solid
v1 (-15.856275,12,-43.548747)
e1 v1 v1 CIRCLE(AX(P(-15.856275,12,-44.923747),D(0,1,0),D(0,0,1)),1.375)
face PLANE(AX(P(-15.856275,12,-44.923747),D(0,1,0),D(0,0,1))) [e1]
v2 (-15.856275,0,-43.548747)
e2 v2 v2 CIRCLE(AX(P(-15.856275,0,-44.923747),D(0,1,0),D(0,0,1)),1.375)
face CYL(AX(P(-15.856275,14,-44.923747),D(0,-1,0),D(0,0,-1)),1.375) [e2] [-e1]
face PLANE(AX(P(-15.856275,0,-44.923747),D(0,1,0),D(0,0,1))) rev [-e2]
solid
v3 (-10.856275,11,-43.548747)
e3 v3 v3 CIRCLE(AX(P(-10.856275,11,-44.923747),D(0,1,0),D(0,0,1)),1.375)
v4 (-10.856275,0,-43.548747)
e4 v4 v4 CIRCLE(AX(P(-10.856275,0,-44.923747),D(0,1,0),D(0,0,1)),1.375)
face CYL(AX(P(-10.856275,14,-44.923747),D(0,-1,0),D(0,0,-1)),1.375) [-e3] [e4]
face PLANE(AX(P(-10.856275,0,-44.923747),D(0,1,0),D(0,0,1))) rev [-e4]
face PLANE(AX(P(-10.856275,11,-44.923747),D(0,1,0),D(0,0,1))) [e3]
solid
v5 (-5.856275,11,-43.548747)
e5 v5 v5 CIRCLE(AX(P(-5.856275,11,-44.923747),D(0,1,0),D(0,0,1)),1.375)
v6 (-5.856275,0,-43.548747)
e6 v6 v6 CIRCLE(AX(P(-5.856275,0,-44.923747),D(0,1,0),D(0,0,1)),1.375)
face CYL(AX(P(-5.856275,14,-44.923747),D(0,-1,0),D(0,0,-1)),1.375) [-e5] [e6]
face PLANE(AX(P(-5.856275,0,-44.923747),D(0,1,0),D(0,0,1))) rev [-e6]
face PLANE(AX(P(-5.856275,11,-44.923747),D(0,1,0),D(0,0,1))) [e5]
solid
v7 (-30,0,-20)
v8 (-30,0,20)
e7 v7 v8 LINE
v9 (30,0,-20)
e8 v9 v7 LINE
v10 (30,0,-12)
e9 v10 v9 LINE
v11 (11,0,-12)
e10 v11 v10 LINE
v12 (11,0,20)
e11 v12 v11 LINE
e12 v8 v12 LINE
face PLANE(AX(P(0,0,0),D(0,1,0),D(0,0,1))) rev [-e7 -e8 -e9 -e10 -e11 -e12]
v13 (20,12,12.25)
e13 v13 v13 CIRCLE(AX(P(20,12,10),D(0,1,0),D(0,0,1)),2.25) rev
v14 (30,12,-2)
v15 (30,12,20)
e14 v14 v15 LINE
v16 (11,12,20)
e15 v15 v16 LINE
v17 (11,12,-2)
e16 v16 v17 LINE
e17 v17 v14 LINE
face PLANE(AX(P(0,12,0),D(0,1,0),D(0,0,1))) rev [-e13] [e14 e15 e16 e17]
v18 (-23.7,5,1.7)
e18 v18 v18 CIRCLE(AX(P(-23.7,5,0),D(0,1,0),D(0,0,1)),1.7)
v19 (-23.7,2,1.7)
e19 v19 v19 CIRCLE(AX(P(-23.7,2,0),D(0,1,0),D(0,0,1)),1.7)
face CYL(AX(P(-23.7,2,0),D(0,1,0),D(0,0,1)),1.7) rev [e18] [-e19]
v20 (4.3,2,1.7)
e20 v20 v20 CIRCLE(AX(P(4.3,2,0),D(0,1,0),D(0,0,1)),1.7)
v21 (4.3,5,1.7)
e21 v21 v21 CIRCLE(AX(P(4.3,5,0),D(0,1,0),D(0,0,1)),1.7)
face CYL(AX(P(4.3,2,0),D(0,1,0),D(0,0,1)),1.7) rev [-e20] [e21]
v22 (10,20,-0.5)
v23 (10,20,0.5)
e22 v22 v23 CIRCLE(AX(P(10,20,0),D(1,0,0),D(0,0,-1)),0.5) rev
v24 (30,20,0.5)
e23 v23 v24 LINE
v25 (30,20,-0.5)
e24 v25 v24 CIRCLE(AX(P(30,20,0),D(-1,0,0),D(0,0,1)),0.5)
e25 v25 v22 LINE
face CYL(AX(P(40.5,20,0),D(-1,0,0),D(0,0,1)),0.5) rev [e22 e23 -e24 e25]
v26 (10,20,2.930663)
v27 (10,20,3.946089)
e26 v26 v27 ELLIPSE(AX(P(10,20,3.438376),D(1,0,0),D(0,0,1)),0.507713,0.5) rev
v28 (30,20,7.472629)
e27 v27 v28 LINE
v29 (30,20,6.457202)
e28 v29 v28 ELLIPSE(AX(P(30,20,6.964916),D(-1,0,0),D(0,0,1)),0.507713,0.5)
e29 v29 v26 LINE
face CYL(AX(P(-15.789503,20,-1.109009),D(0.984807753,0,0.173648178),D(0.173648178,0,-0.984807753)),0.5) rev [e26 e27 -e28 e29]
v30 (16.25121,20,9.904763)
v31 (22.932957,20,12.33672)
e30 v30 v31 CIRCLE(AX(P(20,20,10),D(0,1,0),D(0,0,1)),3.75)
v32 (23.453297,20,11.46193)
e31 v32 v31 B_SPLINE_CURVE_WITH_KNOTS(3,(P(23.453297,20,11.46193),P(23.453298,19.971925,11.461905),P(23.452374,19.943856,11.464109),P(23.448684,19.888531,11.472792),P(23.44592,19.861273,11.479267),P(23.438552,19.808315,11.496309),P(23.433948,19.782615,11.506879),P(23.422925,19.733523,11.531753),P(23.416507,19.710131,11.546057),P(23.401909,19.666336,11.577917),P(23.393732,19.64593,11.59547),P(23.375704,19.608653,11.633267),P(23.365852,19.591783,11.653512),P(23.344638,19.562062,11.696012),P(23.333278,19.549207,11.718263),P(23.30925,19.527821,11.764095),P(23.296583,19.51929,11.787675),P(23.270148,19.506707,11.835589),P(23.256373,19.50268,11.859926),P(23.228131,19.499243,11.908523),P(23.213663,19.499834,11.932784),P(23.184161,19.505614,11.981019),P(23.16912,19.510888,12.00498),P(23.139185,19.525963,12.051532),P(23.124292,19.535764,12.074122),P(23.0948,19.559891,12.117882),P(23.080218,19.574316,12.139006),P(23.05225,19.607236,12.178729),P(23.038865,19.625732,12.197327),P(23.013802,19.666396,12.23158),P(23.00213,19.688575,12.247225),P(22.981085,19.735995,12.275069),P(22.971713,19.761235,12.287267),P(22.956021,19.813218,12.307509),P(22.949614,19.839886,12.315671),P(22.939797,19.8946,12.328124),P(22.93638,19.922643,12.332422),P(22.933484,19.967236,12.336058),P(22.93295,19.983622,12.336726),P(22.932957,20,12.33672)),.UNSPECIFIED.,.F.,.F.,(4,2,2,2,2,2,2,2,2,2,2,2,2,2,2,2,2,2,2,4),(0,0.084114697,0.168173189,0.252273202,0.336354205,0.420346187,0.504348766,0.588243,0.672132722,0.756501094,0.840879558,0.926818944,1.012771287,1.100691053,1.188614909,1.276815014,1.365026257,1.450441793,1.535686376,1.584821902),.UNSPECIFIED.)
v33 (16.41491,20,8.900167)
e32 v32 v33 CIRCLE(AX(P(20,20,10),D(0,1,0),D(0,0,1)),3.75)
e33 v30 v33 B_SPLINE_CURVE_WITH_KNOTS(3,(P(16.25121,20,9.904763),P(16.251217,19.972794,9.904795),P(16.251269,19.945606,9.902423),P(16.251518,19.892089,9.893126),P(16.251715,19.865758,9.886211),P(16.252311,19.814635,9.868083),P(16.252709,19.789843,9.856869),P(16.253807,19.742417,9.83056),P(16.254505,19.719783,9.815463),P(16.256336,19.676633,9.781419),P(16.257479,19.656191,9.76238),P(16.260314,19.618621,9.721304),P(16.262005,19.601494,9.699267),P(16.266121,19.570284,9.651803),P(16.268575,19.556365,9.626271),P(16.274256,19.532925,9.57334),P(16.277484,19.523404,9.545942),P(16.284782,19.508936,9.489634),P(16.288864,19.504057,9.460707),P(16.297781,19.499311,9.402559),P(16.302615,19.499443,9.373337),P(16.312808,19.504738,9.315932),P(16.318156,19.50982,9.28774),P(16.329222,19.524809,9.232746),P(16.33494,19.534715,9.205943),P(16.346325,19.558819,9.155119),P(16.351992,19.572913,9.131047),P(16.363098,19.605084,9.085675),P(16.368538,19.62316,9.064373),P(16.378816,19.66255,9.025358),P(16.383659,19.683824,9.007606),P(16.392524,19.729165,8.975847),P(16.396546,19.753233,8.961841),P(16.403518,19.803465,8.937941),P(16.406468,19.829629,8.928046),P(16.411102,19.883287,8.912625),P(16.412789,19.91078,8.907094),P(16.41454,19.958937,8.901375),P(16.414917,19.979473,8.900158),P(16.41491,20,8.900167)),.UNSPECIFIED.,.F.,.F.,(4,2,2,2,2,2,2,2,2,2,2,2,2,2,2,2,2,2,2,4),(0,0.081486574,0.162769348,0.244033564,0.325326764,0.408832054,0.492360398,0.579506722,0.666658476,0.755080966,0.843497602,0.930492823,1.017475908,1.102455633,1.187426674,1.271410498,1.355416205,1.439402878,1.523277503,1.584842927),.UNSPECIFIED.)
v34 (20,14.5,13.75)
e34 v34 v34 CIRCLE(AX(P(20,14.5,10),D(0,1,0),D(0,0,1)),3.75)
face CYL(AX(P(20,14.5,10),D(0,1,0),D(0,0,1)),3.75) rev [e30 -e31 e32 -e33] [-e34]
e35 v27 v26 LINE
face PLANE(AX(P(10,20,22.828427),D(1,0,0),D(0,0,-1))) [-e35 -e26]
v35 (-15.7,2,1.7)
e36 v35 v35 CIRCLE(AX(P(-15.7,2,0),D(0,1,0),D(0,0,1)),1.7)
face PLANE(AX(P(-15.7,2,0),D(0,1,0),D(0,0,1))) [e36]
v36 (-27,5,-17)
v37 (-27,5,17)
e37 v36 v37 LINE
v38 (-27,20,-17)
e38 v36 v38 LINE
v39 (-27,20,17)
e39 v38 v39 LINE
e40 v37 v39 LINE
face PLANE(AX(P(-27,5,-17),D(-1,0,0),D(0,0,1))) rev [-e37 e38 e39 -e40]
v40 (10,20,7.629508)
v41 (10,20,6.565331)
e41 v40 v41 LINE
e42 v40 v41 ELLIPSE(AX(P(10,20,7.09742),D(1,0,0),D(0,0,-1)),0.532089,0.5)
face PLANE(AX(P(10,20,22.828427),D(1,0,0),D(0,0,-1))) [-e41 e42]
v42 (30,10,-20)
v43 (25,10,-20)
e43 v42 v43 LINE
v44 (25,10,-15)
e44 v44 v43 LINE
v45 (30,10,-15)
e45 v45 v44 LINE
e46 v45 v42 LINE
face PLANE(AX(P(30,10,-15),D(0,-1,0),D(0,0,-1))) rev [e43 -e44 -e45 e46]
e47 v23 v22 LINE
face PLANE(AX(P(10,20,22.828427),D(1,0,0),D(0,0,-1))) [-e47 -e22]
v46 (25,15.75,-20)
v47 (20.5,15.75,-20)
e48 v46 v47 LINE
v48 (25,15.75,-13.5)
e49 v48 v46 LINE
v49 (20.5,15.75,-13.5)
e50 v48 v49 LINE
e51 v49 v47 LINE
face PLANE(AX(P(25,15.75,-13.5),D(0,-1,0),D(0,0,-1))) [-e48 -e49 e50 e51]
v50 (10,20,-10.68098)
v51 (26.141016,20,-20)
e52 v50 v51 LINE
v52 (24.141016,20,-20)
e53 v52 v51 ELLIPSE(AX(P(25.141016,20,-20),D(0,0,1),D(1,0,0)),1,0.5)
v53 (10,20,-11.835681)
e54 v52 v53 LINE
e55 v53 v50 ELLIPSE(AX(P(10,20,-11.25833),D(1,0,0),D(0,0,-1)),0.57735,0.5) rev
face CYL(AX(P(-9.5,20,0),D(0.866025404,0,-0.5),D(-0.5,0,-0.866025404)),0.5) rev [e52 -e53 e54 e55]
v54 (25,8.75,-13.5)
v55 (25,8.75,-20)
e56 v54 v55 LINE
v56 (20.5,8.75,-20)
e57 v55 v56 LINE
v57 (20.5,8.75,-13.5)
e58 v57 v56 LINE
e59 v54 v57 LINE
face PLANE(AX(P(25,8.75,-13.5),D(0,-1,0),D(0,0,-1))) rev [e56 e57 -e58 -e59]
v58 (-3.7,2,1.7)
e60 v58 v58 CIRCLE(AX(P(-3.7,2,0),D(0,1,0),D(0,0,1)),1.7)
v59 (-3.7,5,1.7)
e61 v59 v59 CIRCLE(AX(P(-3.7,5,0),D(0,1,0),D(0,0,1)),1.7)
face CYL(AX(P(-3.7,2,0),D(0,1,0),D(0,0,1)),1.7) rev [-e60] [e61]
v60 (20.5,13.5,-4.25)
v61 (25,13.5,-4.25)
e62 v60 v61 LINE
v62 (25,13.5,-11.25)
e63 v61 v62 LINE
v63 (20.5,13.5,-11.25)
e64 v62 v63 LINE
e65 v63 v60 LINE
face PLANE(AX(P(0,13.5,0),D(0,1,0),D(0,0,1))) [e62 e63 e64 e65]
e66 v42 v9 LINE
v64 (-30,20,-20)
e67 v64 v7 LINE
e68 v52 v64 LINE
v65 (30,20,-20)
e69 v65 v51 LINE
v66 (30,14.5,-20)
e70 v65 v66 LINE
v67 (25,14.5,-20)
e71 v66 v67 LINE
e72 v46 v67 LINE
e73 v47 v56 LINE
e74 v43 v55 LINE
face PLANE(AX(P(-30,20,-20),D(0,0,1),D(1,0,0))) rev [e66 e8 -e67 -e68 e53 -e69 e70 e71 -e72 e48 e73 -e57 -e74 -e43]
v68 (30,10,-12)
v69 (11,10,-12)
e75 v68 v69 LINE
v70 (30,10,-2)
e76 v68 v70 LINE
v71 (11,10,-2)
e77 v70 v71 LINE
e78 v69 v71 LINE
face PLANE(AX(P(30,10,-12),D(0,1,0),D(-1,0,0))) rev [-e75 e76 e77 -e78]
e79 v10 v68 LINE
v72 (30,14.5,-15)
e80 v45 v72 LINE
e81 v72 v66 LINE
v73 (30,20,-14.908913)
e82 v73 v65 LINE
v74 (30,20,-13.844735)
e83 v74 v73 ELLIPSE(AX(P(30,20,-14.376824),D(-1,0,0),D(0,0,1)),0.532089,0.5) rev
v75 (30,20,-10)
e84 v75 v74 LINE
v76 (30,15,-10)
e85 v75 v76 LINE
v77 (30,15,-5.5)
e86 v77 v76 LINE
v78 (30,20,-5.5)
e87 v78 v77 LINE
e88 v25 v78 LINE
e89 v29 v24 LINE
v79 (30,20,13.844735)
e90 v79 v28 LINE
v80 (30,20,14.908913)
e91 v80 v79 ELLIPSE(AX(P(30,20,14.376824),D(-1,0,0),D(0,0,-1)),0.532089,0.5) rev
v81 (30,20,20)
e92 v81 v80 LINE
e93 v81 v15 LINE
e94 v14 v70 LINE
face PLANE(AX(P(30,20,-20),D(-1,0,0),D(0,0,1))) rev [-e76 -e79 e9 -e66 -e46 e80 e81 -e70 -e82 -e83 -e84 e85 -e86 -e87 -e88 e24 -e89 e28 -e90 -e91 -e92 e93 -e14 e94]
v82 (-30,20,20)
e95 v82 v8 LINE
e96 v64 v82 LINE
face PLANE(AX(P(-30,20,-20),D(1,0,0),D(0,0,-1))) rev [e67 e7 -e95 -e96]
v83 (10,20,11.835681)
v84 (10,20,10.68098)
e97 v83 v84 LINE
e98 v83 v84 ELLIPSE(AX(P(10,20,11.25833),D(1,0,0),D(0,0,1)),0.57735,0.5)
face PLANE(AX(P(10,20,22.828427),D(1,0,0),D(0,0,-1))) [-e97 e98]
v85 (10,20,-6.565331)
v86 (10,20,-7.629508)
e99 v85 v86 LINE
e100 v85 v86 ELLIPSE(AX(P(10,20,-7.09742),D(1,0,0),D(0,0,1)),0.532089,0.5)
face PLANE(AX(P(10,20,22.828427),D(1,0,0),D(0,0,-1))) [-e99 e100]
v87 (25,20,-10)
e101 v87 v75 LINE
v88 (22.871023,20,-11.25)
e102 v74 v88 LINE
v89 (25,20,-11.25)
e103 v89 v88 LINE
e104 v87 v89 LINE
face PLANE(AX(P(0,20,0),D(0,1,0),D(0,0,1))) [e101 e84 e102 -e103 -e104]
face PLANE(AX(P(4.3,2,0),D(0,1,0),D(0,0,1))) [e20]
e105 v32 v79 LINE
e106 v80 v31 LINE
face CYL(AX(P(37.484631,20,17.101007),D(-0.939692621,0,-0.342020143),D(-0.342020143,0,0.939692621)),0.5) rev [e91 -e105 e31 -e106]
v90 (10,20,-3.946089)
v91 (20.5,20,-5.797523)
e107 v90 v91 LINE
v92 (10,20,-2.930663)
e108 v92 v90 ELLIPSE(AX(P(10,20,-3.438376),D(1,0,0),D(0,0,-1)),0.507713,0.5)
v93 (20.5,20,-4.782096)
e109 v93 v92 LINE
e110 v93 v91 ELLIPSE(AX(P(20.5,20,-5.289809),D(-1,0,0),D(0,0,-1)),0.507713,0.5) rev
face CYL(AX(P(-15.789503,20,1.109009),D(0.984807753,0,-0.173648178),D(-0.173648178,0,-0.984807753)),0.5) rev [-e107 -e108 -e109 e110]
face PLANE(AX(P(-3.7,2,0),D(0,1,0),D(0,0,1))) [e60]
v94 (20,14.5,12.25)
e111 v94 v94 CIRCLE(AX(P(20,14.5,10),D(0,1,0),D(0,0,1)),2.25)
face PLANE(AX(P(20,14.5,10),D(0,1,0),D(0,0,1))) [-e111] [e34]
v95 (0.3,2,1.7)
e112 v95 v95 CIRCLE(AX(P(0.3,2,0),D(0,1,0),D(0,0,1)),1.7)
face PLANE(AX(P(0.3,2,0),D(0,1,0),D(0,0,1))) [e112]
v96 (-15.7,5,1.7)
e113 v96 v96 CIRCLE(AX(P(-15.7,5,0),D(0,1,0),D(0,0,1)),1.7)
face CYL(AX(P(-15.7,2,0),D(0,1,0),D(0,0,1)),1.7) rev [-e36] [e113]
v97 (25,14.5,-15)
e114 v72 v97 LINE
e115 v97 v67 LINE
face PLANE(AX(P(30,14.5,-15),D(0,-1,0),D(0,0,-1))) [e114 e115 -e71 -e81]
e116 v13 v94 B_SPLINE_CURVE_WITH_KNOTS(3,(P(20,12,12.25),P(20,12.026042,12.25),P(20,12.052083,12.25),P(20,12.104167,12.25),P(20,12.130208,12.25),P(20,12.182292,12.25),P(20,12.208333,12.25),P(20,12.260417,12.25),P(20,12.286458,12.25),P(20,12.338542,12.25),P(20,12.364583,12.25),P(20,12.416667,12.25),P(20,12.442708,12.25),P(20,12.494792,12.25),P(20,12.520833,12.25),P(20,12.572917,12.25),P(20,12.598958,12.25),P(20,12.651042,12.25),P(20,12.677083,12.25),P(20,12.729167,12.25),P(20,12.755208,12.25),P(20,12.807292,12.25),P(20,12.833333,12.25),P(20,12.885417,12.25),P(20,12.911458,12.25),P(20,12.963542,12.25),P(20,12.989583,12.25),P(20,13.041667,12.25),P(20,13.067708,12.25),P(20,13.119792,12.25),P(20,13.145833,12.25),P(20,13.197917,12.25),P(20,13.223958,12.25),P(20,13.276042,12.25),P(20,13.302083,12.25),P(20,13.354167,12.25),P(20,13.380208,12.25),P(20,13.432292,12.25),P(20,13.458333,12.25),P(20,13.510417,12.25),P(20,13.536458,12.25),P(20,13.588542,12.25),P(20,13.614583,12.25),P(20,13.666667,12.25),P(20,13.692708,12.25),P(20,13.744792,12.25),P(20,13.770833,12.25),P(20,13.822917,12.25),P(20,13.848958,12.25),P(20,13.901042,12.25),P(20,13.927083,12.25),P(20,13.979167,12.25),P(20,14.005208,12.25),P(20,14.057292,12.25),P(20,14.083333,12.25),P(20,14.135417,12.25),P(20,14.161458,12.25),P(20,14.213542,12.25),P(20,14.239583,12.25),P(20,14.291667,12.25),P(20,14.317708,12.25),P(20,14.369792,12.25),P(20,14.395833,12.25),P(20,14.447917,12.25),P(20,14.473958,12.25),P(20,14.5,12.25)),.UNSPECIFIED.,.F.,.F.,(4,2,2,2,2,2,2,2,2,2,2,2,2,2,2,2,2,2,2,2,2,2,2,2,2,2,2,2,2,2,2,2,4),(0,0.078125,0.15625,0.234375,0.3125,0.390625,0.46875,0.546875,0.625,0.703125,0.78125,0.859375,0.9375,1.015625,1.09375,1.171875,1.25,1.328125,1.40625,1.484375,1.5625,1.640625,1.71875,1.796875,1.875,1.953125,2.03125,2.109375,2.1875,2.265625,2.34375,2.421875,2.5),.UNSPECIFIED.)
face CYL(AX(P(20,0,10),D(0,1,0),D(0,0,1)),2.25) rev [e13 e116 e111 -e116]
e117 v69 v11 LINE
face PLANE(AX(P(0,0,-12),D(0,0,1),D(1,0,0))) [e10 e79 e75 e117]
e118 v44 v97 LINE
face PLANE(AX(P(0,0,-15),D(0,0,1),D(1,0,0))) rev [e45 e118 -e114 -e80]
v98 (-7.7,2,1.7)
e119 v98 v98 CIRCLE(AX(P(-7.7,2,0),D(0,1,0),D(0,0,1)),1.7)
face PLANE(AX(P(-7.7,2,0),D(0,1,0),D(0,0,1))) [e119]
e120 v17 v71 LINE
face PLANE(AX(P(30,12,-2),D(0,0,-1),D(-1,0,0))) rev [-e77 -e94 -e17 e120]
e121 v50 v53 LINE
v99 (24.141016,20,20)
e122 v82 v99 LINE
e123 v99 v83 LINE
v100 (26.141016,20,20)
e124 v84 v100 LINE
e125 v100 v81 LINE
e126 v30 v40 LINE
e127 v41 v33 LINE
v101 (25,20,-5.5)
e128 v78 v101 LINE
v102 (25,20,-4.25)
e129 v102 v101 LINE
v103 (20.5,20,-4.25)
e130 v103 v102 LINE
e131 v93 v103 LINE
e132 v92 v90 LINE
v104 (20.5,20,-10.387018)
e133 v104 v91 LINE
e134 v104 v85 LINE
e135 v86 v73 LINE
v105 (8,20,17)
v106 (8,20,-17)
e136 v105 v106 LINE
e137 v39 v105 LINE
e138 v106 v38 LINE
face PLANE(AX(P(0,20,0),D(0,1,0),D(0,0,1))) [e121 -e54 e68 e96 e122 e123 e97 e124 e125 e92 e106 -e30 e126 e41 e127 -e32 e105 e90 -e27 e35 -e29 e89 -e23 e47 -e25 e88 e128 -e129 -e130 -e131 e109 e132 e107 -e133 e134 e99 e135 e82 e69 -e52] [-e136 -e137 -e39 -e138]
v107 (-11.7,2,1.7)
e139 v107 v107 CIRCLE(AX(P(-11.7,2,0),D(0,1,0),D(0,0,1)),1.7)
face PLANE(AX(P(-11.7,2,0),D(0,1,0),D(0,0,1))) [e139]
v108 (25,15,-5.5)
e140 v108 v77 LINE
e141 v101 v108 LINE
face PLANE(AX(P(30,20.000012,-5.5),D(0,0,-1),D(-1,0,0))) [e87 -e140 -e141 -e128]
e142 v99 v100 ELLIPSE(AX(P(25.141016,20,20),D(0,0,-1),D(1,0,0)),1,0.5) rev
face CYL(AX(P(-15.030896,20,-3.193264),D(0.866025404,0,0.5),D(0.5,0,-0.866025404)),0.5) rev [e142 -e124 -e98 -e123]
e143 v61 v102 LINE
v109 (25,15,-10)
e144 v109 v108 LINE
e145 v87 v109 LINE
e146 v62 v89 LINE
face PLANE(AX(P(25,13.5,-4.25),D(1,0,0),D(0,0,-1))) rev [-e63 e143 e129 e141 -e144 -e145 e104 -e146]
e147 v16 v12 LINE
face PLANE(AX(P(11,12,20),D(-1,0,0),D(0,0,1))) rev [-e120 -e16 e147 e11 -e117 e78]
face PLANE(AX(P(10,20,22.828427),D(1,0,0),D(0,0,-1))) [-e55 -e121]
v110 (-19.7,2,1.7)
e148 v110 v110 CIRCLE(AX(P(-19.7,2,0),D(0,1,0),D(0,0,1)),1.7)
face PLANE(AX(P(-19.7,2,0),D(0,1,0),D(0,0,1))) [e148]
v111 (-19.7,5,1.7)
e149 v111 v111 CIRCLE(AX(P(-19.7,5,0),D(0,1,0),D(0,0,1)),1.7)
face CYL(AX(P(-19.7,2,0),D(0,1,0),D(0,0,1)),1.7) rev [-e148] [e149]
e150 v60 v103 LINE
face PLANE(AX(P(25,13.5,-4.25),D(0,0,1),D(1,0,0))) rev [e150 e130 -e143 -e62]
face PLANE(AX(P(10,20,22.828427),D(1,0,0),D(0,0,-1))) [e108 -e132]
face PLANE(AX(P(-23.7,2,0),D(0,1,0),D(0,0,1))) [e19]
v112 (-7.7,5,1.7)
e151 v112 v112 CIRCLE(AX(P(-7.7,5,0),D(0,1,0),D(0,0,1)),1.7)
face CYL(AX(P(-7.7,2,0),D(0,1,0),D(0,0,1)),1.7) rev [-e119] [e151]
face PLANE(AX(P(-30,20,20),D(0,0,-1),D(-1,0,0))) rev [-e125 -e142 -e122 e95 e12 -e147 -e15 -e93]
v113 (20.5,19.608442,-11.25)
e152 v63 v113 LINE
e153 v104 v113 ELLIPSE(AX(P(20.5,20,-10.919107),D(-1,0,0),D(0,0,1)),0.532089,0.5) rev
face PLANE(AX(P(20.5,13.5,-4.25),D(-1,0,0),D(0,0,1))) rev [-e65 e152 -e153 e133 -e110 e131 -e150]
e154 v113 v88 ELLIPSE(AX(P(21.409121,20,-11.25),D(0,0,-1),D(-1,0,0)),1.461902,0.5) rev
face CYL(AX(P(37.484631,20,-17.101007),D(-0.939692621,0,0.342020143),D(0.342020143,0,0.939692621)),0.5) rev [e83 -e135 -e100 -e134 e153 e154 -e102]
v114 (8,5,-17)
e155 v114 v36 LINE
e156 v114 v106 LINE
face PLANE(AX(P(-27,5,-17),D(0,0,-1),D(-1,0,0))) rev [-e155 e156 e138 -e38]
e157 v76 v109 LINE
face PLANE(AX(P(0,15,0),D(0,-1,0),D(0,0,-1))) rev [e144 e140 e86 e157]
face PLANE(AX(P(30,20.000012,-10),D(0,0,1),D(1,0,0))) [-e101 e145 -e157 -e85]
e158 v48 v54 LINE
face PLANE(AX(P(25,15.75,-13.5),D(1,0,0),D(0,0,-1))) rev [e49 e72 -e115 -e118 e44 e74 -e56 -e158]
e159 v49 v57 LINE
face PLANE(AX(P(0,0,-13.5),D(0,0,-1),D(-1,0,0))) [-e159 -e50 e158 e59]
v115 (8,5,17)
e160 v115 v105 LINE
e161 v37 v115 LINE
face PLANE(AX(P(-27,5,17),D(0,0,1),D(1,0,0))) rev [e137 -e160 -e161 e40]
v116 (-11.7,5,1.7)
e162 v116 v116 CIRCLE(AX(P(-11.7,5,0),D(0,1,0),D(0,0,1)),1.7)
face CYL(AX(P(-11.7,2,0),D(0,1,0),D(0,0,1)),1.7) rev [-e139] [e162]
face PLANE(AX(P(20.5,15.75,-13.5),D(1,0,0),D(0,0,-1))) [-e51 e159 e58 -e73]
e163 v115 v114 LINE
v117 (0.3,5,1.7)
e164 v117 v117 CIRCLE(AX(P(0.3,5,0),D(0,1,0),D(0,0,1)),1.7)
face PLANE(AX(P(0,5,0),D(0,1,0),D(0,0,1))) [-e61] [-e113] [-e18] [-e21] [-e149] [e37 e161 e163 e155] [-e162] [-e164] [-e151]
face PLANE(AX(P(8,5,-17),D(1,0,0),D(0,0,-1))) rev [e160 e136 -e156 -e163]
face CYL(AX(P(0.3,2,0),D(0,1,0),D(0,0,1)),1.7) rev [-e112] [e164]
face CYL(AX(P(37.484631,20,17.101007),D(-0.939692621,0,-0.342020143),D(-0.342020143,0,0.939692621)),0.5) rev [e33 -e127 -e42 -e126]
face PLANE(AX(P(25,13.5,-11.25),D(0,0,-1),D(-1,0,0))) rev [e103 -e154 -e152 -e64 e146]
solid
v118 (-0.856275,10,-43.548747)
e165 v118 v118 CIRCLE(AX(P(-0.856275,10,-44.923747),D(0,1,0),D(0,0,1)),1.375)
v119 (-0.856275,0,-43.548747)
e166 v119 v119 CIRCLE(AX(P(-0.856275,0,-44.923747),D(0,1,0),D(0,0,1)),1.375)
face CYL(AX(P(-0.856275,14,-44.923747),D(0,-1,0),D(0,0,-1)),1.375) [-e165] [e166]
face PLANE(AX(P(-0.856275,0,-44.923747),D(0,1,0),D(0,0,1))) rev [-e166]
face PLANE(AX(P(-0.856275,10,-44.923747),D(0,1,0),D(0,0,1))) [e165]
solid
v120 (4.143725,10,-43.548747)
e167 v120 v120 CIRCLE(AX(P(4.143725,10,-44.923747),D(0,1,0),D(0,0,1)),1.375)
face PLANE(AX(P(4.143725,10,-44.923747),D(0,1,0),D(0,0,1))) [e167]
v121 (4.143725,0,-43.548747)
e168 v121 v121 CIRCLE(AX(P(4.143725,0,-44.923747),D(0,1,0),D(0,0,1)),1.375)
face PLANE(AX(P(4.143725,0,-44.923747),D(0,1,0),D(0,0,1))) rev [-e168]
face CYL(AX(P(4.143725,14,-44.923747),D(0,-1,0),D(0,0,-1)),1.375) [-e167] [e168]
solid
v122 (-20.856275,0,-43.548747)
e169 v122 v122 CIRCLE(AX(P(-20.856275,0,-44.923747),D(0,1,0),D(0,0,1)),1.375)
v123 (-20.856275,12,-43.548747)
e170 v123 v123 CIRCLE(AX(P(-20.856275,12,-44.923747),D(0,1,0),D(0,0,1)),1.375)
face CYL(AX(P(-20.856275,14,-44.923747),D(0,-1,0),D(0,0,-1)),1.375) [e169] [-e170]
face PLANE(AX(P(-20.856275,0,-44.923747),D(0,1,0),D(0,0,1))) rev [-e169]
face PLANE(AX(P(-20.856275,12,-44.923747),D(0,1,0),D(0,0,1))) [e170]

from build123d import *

# Parameters (mm, degrees)
SKETCH1_W               = 60
SKETCH1_H               = 40
BOSS_EXTRUDE1_DEPTH     = 20
SKETCH3_W               = 35
SKETCH3_H               = 34
CUT_EXTRUDE2_DEPTH      = 15
SKETCH4_R               = 3.75
CUT_EXTRUDE3_DEPTH      = 5.5
CUT_EXTRUDE4_DEPTH      = 39.861935104
CUT_EXTRUDE4_DEPTH_BACK = 39.861935104
SKETCH5_R               = 2.25
CUT_EXTRUDE5_DEPTH      = 42.231056256
CUT_EXTRUDE5_DEPTH_BACK = 5
SKETCH6_W               = 5
SKETCH6_H               = 4.5
SKETCH7_W               = 4.5
SKETCH7_H               = 7
CUT_EXTRUDE6_DEPTH      = 6.5
SKETCH8_W               = 5
SKETCH8_H               = 4.5
CUT_EXTRUDE7_DEPTH      = 5
SKETCH9_W               = 4.5
SKETCH9_H               = 7
CUT_EXTRUDE8_DEPTH      = 6.5
SKETCH13_R              = 1.7
CUT_EXTRUDE9_DEPTH      = 3
SKETCH14_R              = 1.375
BOSS_EXTRUDE2_DEPTH     = 14
BOSS_EXTRUDE2_2_DEPTH   = 14
BOSS_EXTRUDE2_3_DEPTH   = 14
BOSS_EXTRUDE2_4_DEPTH   = 14
BOSS_EXTRUDE2_5_DEPTH   = 14
BOSS_EXTRUDE2_6_DEPTH   = 14
SKETCH17_R              = 1.375
CUT_EXTRUDE10_DEPTH     = 2
SKETCH18_R              = 1.375
CUT_EXTRUDE11_DEPTH     = 3
SKETCH19_R              = 1.375
CUT_EXTRUDE12_DEPTH     = 4
CUT_SWEEP2_PROFILE_R    = 0.5
CUT_SWEEP3_START        = 8
CUT_SWEEP3_DEPTH        = 22
CUT_SWEEP3_START_2      = 8.326128564
CUT_SWEEP3_2_DEPTH      = 22.515712442
CUT_SWEEP4_PROFILE_R    = 0.5
CUT_SWEEP5_PROFILE_R    = 0.5
BOSS_EXTRUDE3_REACH     = 55.852
SKETCH43_W              = 2
SKETCH43_H              = 2
SKETCH64_W              = 19
SKETCH64_H              = 22
CUT_EXTRUDE13_DEPTH     = 12
SKETCH65_W              = 19
SKETCH65_H              = 10
CUT_EXTRUDE14_DEPTH     = 10


# Read off the part's stored shape, not the designer's step: Cut-Sweep3
with BuildPart() as part:
    # Sketch1 → Boss-Extrude1 (new body)
    with BuildSketch(Plane(origin=(0, 0, 0), x_dir=(1, 0, 0), z_dir=(0, 1, 0))):
        Rectangle(SKETCH1_W, SKETCH1_H)
    extrude(amount=BOSS_EXTRUDE1_DEPTH)

    # Sketch3 → Cut-Extrude2 (cut)
    with BuildSketch(Plane(origin=(0, 20, 0), x_dir=(1, 0, 0), z_dir=(0, 1, 0))):
        with Locations((-9.5, 0)):
            Rectangle(SKETCH3_W, SKETCH3_H)
    extrude(amount=-CUT_EXTRUDE2_DEPTH, mode=Mode.SUBTRACT)

    # Sketch4 → Cut-Extrude3 (cut)
    with BuildSketch(Plane(origin=(0, 20, 0), x_dir=(1, 0, 0), z_dir=(0, 1, 0))):
        with Locations(Location((20, -10, 0), (0, 0, 270))):
            Circle(SKETCH4_R)
    extrude(amount=-CUT_EXTRUDE3_DEPTH, mode=Mode.SUBTRACT)

    # Sketch5 → Cut-Extrude4 (cut, two sides: drawn at the far end of the back side and taken through both)
    with BuildSketch(Plane(origin=(0, 14.5, 0), x_dir=(1, 0, 0), z_dir=(0, 1, 0)).offset(-CUT_EXTRUDE4_DEPTH_BACK)):
        with Locations(Location((20, -10, 0), (0, 0, 270))):
            Circle(SKETCH5_R)
    extrude(amount=CUT_EXTRUDE4_DEPTH + CUT_EXTRUDE4_DEPTH_BACK, mode=Mode.SUBTRACT)

    # Sketch6 → Cut-Extrude5 (cut, two sides: drawn at the far end of the back side and taken through both)
    with BuildSketch(Plane(origin=(0, 20, 0), x_dir=(1, 0, 0), z_dir=(0, 1, 0)).offset(-CUT_EXTRUDE5_DEPTH_BACK)):
        with Locations((27.5, 7.75)):
            Rectangle(SKETCH6_W, SKETCH6_H)
    extrude(amount=CUT_EXTRUDE5_DEPTH + CUT_EXTRUDE5_DEPTH_BACK, mode=Mode.SUBTRACT)

    # Sketch7 → Cut-Extrude6 (cut)
    with BuildSketch(Plane(origin=(0, 20, 0), x_dir=(1, 0, 0), z_dir=(0, 1, 0))):
        with Locations((22.75, 7.75)):
            Rectangle(SKETCH7_W, SKETCH7_H)
    extrude(amount=-CUT_EXTRUDE6_DEPTH, mode=Mode.SUBTRACT)

    # Sketch8 → Cut-Extrude7 (cut)
    with BuildSketch(Plane(origin=(0, 0, -20), x_dir=(-1, 0, 0), z_dir=(0, 0, -1))):
        with Locations((-27.5, 12.25)):
            Rectangle(SKETCH8_W, SKETCH8_H)
    extrude(amount=-CUT_EXTRUDE7_DEPTH, mode=Mode.SUBTRACT)

    # Sketch9 → Cut-Extrude8 (cut)
    with BuildSketch(Plane(origin=(0, 0, -20), x_dir=(-1, 0, 0), z_dir=(0, 0, -1))):
        with Locations((-22.75, 12.25)):
            Rectangle(SKETCH9_W, SKETCH9_H)
    extrude(amount=-CUT_EXTRUDE8_DEPTH, mode=Mode.SUBTRACT)

    # Sketch13 → Cut-Extrude9 (cut)
    with BuildSketch(Plane(origin=(0, 5, 0), x_dir=(1, 0, 0), z_dir=(0, 1, 0))):
        with Locations(Location((-23.7, 0, 0), (0, 0, 270))):
            Circle(SKETCH13_R)
        with Locations(Location((-19.7, 0, 0), (0, 0, 270))):
            Circle(SKETCH13_R)
        with Locations(Location((-15.7, 0, 0), (0, 0, 270))):
            Circle(SKETCH13_R)
        with Locations(Location((-11.7, 0, 0), (0, 0, 270))):
            Circle(SKETCH13_R)
        with Locations(Location((-7.7, 0, 0), (0, 0, 270))):
            Circle(SKETCH13_R)
        with Locations(Location((-3.7, 0, 0), (0, 0, 270))):
            Circle(SKETCH13_R)
        with Locations(Location((0.3, 0, 0), (0, 0, 270))):
            Circle(SKETCH13_R)
        with Locations(Location((4.3, 0, 0), (0, 0, 270))):
            Circle(SKETCH13_R)
    extrude(amount=-CUT_EXTRUDE9_DEPTH, mode=Mode.SUBTRACT)

    # Cut-Sweep2: sweep along a path in Sketch20
    with BuildLine(Plane(origin=(0, 20, 0), x_dir=(1, 0, 0), z_dir=(0, 1, 0))) as cut_sweep2_path:
        Line((37.484631039, -17.101007166), (-9.5, 0))
        Line((-9.5, 0), (33.801270189, -25))
    # Cut-Sweep2 profile (on start of the path) → Cut-Sweep2 (sweep, cut)
    with BuildSketch(Plane(origin=(37.484631039, 20, 17.101007166), x_dir=(0.3420201433256682, 0, -0.9396926207859086), z_dir=(-0.9396926207859086, 0, -0.3420201433256682))):
        Circle(CUT_SWEEP2_PROFILE_R)
    sweep(path=cut_sweep2_path.line, transition=Transition.RIGHT, mode=Mode.SUBTRACT)

    # Cut-Sweep3 outline → Cut-Sweep3 (cut)
    with BuildSketch(Plane.YZ.offset(CUT_SWEEP3_START)):
        with BuildLine():
            ThreePointArc((20, 0.5), (19.5, 0), (20, -0.5))
            Line((20, -0.5), (20, 0.5))
        make_face()
    extrude(amount=CUT_SWEEP3_DEPTH, mode=Mode.SUBTRACT)

    # Cut-Sweep3 2 outline → Cut-Sweep3 2 (cut)
    with BuildSketch(Plane(origin=(0, 0, 0), x_dir=(0, 1, 0), z_dir=(0.9848077530122084, 0, 0.17364817766692905)).offset(CUT_SWEEP3_START_2)):
        with BuildLine():
            Line((20, 1.149657688), (20, 2.149657688))
            ThreePointArc((20, 2.149657688), (19.5, 1.649657688), (20, 1.149657688))
        make_face()
    extrude(amount=CUT_SWEEP3_2_DEPTH, mode=Mode.SUBTRACT)

    # Cut-Sweep4: sweep along a path in Sketch29
    with BuildLine(Plane(origin=(0, 20, 0), x_dir=(1, 0, 0), z_dir=(0, 1, 0))) as cut_sweep4_path:
        Line((37.484631039, 17.101007166), (-9.5, 0))
        Line((-9.5, 0), (39.740387651, 8.682408883))
    # Cut-Sweep4 profile (on start of the path) → Cut-Sweep4 (sweep, cut)
    with BuildSketch(Plane(origin=(37.484631039, 20, -17.101007166), x_dir=(-0.3420201433256707, 0, -0.9396926207859078), z_dir=(-0.9396926207859078, 0, 0.3420201433256707))):
        Circle(CUT_SWEEP4_PROFILE_R)
    sweep(path=cut_sweep4_path.line, transition=Transition.RIGHT, mode=Mode.SUBTRACT)

    # Cut-Sweep5: sweep along a path in Sketch36
    with BuildLine(Plane(origin=(0, 20, 0), x_dir=(1, 0, 0), z_dir=(0, 1, 0))) as cut_sweep5_path:
        Line((-9.5, 0), (33.801270189, 25))
    # Cut-Sweep5 profile (on start of the path) → Cut-Sweep5 (sweep, cut)
    with BuildSketch(Plane(origin=(-9.5, 20, 0), x_dir=(0.5000000000000024, 0, 0.8660254037844373), z_dir=(0.8660254037844373, 0, -0.5000000000000024))):
        Circle(CUT_SWEEP5_PROFILE_R)
    sweep(path=cut_sweep5_path.line, mode=Mode.SUBTRACT)

    # Boss-Extrude3: up to this face of the body (flat: up to its plane)
    boss_extrude3_end = Plane(part.part.faces().sort_by_distance((-0.016465533, 9.993589709, 20))[0])
    # Sketch43 → Boss-Extrude3 (add, up to the picked face)
    with BuildSketch(Plane(origin=(0, 0, -20), x_dir=(-1, 0, 0), z_dir=(0, 0, -1)), mode=Mode.PRIVATE) as boss_extrude3_sk1:
        with Locations((-9, 19)):
            Rectangle(SKETCH43_W, SKETCH43_H)
    boss_extrude3_tool1 = split(extrude(boss_extrude3_sk1.sketch, amount=-BOSS_EXTRUDE3_REACH, mode=Mode.PRIVATE), bisect_by=boss_extrude3_end, keep=Keep.BOTH, mode=Mode.PRIVATE)
    add(boss_extrude3_tool1.solids().sort_by(Axis((9, 19, -20), (0, 0, 1)))[0])

    # Sketch64 → Cut-Extrude13 (cut)
    with BuildSketch(Plane.XZ):
        with Locations((20.5, 9)):
            Rectangle(SKETCH64_W, SKETCH64_H)
    extrude(amount=-CUT_EXTRUDE13_DEPTH, mode=Mode.SUBTRACT)

    # Sketch65 → Cut-Extrude14 (cut)
    with BuildSketch(Plane.XY.offset(-2)):
        with Locations((20.5, 5)):
            Rectangle(SKETCH65_W, SKETCH65_H)
    extrude(amount=-CUT_EXTRUDE14_DEPTH, mode=Mode.SUBTRACT)


with BuildPart() as body_2:
    # Sketch14 → Boss-Extrude2 (new body)
    with BuildSketch(Plane(origin=(0, 0, 0), x_dir=(1, 0, 0), z_dir=(0, 1, 0))):
        with Locations(Location((-20.856275458, 44.923746701, 0), (0, 0, 270))):
            Circle(SKETCH14_R)
    extrude(amount=BOSS_EXTRUDE2_DEPTH)


with BuildPart() as body_3:
    # Sketch14 → Boss-Extrude2 2 (new body)
    with BuildSketch(Plane(origin=(0, 0, 0), x_dir=(1, 0, 0), z_dir=(0, 1, 0))):
        with Locations(Location((-15.856275458, 44.923746701, 0), (0, 0, 270))):
            Circle(SKETCH14_R)
    extrude(amount=BOSS_EXTRUDE2_2_DEPTH)


with BuildPart() as body_4:
    # Sketch14 → Boss-Extrude2 3 (new body)
    with BuildSketch(Plane(origin=(0, 0, 0), x_dir=(1, 0, 0), z_dir=(0, 1, 0))):
        with Locations(Location((-10.856275458, 44.923746701, 0), (0, 0, 270))):
            Circle(SKETCH14_R)
    extrude(amount=BOSS_EXTRUDE2_3_DEPTH)


with BuildPart() as body_5:
    # Sketch14 → Boss-Extrude2 4 (new body)
    with BuildSketch(Plane(origin=(0, 0, 0), x_dir=(1, 0, 0), z_dir=(0, 1, 0))):
        with Locations(Location((-5.856275458, 44.923746701, 0), (0, 0, 270))):
            Circle(SKETCH14_R)
    extrude(amount=BOSS_EXTRUDE2_4_DEPTH)


with BuildPart() as body_6:
    # Sketch14 → Boss-Extrude2 5 (new body)
    with BuildSketch(Plane(origin=(0, 0, 0), x_dir=(1, 0, 0), z_dir=(0, 1, 0))):
        with Locations(Location((-0.856275458, 44.923746701, 0), (0, 0, 270))):
            Circle(SKETCH14_R)
    extrude(amount=BOSS_EXTRUDE2_5_DEPTH)


with BuildPart() as body_7:
    # Sketch14 → Boss-Extrude2 6 (new body)
    with BuildSketch(Plane(origin=(0, 0, 0), x_dir=(1, 0, 0), z_dir=(0, 1, 0))):
        with Locations(Location((4.143724542, 44.923746701, 0), (0, 0, 270))):
            Circle(SKETCH14_R)
    extrude(amount=BOSS_EXTRUDE2_6_DEPTH)


with BuildPart() as cut_extrude10_tool:
    # Sketch17 → Cut-Extrude10 (new body)
    with BuildSketch(Plane(origin=(0, 14, 0), x_dir=(1, 0, 0), z_dir=(0, 1, 0))):
        with Locations(Location((-20.856275458, 44.923746701, 0), (0, 0, 270))):
            Circle(SKETCH17_R)
        with Locations(Location((-15.856275458, 44.923746701, 0), (0, 0, 270))):
            Circle(SKETCH17_R)
    extrude(amount=-CUT_EXTRUDE10_DEPTH)


with BuildPart() as body_2_1:
    add(body_2.part)

    # Cut-Extrude10: cut by cut_extrude10_tool
    add(cut_extrude10_tool.part, mode=Mode.SUBTRACT)


with BuildPart() as body_3_1:
    add(body_3.part)

    # Cut-Extrude10: cut by cut_extrude10_tool
    add(cut_extrude10_tool.part, mode=Mode.SUBTRACT)


with BuildPart() as cut_extrude11_tool:
    # Sketch18 → Cut-Extrude11 (new body)
    with BuildSketch(Plane(origin=(0, 14, 0), x_dir=(1, 0, 0), z_dir=(0, 1, 0))):
        with Locations(Location((-10.856275458, 44.923746701, 0), (0, 0, 270))):
            Circle(SKETCH18_R)
        with Locations(Location((-5.856275458, 44.923746701, 0), (0, 0, 270))):
            Circle(SKETCH18_R)
    extrude(amount=-CUT_EXTRUDE11_DEPTH)


with BuildPart() as body_4_1:
    add(body_4.part)

    # Cut-Extrude11: cut by cut_extrude11_tool
    add(cut_extrude11_tool.part, mode=Mode.SUBTRACT)


with BuildPart() as body_5_1:
    add(body_5.part)

    # Cut-Extrude11: cut by cut_extrude11_tool
    add(cut_extrude11_tool.part, mode=Mode.SUBTRACT)


with BuildPart() as cut_extrude12_tool:
    # Sketch19 → Cut-Extrude12 (new body)
    with BuildSketch(Plane(origin=(0, 14, 0), x_dir=(1, 0, 0), z_dir=(0, 1, 0))):
        with Locations(Location((-0.856275458, 44.923746701, 0), (0, 0, 270))):
            Circle(SKETCH19_R)
        with Locations(Location((4.143724542, 44.923746701, 0), (0, 0, 270))):
            Circle(SKETCH19_R)
    extrude(amount=-CUT_EXTRUDE12_DEPTH)


with BuildPart() as body_6_1:
    add(body_6.part)

    # Cut-Extrude12: cut by cut_extrude12_tool
    add(cut_extrude12_tool.part, mode=Mode.SUBTRACT)


with BuildPart() as body_7_1:
    add(body_7.part)

    # Cut-Extrude12: cut by cut_extrude12_tool
    add(cut_extrude12_tool.part, mode=Mode.SUBTRACT)


solid = Compound([part.part, body_2_1.part, body_3_1.part, body_4_1.part, body_5_1.part, body_6_1.part, body_7_1.part])
